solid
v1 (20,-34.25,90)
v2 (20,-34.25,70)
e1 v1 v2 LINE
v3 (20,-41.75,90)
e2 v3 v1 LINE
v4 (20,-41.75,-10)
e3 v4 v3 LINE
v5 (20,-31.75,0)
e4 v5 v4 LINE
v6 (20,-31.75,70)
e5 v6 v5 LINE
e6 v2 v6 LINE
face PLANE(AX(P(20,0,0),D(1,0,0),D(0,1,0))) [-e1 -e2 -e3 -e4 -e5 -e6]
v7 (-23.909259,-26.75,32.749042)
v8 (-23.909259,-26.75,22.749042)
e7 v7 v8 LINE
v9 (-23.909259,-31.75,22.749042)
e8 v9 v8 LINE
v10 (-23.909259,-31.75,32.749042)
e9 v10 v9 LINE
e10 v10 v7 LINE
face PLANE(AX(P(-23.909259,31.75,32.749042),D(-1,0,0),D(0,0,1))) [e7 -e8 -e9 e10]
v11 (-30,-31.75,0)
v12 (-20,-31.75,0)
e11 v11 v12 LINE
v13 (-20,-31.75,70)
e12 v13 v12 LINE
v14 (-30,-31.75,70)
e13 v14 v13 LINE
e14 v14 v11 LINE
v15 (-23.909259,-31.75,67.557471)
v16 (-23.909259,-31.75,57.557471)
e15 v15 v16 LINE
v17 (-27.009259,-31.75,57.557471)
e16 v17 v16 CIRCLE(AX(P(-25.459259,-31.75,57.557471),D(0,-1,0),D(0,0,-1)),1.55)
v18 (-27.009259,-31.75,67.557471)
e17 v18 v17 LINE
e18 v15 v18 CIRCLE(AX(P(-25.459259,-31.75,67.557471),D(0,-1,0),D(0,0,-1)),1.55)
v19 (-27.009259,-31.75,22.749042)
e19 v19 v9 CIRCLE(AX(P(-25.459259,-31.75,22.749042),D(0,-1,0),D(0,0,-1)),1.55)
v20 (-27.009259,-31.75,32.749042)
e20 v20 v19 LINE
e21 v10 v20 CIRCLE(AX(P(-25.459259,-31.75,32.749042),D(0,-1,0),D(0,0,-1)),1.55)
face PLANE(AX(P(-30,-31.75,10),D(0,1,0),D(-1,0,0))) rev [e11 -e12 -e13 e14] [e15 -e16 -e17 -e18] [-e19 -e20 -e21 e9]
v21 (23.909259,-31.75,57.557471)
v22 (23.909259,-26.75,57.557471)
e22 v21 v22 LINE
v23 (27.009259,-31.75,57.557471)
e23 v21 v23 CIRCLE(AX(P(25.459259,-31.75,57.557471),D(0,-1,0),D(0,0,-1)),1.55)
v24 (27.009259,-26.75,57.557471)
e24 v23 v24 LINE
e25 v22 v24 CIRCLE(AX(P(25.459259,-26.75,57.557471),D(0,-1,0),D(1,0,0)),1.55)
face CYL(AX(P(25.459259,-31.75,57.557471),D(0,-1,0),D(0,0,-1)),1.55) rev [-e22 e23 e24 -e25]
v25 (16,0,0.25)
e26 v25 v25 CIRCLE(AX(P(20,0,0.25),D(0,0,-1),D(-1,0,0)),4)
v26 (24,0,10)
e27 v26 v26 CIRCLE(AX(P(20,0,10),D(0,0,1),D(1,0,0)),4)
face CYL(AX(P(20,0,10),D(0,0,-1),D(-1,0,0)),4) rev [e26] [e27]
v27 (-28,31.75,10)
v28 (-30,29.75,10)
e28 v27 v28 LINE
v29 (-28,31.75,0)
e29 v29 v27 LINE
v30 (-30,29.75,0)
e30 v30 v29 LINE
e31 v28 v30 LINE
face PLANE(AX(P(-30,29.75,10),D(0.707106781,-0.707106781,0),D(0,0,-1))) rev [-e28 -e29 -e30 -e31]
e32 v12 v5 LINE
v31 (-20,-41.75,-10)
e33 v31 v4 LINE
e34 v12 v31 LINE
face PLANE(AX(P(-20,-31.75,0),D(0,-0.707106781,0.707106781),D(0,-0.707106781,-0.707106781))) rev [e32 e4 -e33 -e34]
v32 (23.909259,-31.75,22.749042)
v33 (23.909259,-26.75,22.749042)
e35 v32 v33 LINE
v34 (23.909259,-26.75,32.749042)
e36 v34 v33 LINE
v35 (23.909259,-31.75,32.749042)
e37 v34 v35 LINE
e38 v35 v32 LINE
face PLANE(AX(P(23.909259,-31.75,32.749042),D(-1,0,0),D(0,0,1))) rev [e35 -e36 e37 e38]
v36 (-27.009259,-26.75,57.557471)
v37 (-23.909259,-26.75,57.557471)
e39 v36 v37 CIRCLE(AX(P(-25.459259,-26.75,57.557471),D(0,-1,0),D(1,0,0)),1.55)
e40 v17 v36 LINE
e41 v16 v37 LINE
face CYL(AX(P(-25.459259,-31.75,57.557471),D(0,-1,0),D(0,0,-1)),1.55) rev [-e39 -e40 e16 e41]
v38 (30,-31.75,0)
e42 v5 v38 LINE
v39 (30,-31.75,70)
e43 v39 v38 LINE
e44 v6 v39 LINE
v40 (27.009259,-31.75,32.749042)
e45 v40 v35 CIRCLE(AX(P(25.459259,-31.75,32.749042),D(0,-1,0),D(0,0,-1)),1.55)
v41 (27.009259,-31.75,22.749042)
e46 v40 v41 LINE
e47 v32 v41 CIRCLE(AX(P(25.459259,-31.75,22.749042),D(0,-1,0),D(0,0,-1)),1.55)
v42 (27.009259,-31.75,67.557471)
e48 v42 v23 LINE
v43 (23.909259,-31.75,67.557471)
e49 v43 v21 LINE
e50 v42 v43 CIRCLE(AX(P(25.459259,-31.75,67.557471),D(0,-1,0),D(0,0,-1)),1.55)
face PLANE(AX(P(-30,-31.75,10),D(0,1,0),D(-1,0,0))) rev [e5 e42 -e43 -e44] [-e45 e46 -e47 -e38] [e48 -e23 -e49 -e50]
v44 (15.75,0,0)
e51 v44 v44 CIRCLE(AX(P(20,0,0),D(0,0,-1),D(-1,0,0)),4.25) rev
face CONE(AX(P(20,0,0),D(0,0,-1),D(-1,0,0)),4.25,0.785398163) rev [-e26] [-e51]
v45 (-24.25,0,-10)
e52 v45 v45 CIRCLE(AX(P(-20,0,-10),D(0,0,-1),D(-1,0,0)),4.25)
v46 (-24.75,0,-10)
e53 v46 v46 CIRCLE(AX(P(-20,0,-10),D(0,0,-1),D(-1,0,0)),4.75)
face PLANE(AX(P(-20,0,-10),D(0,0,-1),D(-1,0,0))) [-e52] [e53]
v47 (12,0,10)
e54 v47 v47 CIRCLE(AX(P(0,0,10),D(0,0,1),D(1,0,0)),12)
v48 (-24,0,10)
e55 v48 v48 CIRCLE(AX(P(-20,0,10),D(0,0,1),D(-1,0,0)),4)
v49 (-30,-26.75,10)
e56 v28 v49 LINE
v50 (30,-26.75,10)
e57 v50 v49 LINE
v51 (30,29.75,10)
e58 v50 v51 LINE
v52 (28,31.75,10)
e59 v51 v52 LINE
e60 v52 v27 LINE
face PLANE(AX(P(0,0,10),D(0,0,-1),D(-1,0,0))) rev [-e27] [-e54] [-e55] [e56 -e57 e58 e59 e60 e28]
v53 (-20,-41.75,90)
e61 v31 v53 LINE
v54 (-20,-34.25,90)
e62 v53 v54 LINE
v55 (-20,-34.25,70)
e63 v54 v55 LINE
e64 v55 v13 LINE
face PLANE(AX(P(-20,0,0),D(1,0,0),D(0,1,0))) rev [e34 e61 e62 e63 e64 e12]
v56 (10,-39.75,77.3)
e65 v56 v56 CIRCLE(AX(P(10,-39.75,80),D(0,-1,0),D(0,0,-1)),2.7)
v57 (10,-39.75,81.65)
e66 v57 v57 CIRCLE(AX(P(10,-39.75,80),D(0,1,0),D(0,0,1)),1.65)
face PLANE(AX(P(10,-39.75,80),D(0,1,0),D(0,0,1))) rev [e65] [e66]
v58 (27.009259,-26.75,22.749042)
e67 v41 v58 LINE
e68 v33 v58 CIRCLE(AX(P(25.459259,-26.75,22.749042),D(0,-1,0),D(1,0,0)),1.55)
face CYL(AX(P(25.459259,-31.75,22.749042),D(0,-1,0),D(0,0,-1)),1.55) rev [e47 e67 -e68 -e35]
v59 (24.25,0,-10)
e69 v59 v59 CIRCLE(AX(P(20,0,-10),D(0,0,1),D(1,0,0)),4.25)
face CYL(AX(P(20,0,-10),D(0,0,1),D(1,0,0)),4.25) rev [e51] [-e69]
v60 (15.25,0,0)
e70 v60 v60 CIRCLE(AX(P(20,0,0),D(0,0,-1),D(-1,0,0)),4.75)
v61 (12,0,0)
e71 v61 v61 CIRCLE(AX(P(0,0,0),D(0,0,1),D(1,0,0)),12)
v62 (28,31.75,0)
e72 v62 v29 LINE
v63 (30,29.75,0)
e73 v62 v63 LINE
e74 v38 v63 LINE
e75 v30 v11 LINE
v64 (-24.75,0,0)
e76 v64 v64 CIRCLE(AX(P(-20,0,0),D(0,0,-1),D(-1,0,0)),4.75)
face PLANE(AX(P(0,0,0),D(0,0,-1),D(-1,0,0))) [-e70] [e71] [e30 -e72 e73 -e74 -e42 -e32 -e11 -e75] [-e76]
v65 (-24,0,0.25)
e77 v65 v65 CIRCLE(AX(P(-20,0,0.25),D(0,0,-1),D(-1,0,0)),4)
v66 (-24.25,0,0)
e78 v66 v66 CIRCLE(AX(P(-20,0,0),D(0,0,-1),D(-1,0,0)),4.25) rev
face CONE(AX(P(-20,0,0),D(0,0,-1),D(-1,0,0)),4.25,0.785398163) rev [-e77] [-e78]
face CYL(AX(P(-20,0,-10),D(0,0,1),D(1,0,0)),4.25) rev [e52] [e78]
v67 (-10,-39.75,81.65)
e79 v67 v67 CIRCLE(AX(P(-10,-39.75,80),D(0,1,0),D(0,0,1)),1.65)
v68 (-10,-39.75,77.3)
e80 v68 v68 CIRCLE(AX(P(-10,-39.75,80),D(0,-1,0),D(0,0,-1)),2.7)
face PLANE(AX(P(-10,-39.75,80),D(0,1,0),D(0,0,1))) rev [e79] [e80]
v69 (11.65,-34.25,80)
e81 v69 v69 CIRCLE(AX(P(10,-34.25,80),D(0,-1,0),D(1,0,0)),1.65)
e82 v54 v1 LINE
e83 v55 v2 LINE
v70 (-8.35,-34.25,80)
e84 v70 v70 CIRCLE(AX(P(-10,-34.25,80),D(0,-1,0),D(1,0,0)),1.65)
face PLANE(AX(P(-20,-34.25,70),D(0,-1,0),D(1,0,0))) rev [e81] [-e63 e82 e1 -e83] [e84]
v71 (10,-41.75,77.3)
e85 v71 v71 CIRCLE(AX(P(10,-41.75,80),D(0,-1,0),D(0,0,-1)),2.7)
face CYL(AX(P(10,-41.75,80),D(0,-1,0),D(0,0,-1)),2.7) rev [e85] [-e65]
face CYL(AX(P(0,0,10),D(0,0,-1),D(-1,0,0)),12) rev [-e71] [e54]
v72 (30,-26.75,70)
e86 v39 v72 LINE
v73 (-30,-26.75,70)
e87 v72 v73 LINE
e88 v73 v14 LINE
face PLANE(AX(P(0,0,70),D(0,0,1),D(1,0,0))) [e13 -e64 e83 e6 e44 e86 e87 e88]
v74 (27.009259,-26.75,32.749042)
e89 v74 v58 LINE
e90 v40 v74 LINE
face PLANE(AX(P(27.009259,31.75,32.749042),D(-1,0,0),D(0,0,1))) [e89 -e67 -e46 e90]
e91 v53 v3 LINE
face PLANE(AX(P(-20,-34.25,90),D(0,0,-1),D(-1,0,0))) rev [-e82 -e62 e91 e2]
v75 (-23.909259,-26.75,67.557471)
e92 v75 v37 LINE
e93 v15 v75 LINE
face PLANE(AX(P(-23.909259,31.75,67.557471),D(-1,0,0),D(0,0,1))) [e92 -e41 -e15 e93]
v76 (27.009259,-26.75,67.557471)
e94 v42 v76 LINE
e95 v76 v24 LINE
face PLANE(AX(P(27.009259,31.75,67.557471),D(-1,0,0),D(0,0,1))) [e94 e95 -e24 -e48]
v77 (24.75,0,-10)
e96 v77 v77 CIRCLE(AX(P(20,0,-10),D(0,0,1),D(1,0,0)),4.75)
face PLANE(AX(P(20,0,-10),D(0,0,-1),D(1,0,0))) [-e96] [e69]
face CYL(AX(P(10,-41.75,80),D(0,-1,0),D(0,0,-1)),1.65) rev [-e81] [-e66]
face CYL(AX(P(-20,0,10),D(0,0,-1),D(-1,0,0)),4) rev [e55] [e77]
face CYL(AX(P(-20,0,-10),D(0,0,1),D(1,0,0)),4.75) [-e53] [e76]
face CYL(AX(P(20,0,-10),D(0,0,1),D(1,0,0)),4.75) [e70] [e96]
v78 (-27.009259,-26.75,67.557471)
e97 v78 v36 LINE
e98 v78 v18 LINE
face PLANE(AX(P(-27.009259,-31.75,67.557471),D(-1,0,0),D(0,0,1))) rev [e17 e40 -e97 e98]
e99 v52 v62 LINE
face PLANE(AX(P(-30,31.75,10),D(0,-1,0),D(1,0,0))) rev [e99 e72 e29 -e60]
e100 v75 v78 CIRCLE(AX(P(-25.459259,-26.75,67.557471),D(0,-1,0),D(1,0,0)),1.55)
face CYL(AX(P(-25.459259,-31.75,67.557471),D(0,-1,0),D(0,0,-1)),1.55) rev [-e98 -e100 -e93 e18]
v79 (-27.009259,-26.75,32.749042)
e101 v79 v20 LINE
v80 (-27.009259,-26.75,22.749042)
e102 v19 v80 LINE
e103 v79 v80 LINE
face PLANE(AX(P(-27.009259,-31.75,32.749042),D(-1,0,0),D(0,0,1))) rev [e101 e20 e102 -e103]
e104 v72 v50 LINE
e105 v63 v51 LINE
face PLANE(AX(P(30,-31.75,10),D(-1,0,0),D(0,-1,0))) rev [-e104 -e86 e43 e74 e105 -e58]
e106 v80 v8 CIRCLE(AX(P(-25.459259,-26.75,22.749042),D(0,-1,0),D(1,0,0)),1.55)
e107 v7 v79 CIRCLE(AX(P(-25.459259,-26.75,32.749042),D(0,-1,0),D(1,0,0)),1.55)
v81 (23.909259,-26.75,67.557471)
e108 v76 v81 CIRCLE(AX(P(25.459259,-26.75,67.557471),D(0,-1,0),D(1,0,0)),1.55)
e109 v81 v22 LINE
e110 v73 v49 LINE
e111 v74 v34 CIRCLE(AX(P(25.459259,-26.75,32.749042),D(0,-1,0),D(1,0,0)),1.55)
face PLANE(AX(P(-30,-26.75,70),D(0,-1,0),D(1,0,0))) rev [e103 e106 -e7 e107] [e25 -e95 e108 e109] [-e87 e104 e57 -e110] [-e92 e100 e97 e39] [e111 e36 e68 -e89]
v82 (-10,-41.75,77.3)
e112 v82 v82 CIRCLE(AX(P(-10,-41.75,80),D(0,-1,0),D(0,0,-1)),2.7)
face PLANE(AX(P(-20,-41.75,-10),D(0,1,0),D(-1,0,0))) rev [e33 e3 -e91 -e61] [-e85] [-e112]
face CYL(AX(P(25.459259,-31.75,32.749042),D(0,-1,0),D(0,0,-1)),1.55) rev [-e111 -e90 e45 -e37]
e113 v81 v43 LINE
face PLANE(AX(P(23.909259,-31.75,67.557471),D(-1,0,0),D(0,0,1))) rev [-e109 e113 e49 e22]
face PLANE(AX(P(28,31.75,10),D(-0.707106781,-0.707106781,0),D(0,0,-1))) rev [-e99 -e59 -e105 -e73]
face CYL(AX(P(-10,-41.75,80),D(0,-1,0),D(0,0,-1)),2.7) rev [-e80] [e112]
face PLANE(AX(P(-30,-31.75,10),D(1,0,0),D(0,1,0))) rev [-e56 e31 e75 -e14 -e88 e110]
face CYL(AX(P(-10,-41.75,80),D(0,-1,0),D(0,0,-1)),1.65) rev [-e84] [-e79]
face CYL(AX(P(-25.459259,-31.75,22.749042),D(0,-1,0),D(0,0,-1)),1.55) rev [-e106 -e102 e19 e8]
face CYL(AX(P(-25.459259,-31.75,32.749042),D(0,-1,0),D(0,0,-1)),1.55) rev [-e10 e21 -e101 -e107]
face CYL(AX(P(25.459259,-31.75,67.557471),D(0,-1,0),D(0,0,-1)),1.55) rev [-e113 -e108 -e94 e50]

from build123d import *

# Parameters (mm, degrees)
SKETCH_1_W          = 60
SKETCH_1_H          = 63.5
SKETCH_1_R          = 12
SKETCH_1_R_2        = 4
EXTRUDE_1_DEPTH     = 10
CHAMFER_1_SIZE      = 0.25
SKETCH_2_W          = 60
SKETCH_2_H          = 5
EXTRUDE_2_DEPTH     = 60
MM_START            = -31.75
MM_1_DEPTH          = 5
SKETCH_8_R          = 4.75
SKETCH_8_R_2        = 4.25
EXTRUDE_3_DEPTH     = 10
EXTRUDE_4_DEPTH     = 20
CHAMFER_4_SIZE      = 2
HOLE_WIZARD_2_D     = 5.4
HOLE_WIZARD_2_DEPTH = 2
HOLE_WIZARD_3_D     = 3.3


# Read off the part's stored shape, not the designer's step: 大小mm 暗销槽口1
with BuildPart() as part:
    # 草图1 → 凸台-拉伸1 (new body)
    with BuildSketch(Plane.XY):
        Rectangle(SKETCH_1_W, SKETCH_1_H)
        Circle(SKETCH_1_R, mode=Mode.SUBTRACT)
        with Locations((20, 0)):
            Circle(SKETCH_1_R_2, mode=Mode.SUBTRACT)
        with Locations(Location((-20, 0, 0), (0, 0, 180))):
            Circle(SKETCH_1_R_2, mode=Mode.SUBTRACT)
    extrude(amount=EXTRUDE_1_DEPTH)

    # 倒角1
    chamfer_1_edges = [part.edges().sort_by_distance(p)[0] for p in [
        (16, 0, 0),
        (-16, 0, 0),
    ]]
    chamfer(chamfer_1_edges, length=CHAMFER_1_SIZE)

    # 草图2 → 凸台-拉伸2 (add)
    with BuildSketch(Plane.XY.offset(10)):
        with Locations((0, -29.25)):
            Rectangle(SKETCH_2_W, SKETCH_2_H)
    extrude(amount=EXTRUDE_2_DEPTH)

    # 大小mm 暗销槽口1 outline → 大小mm 暗销槽口1 (cut)
    with BuildSketch(Plane(origin=(0, 0, 0), x_dir=(1, 0, 0), z_dir=(0, 1, 0)).offset(MM_START)):
        with BuildLine():
            ThreePointArc((23.909259259, -32.749042146), (25.459259259, -34.299042146), (27.009259259, -32.749042146))
            Line((27.009259259, -32.749042146), (27.009259259, -22.749042146))
            ThreePointArc((27.009259259, -22.749042146), (25.459259259, -21.199042146), (23.909259259, -22.749042146))
            Line((23.909259259, -22.749042146), (23.909259259, -32.749042146))
        make_face()
        with BuildLine():
            Line((27.009259259, -67.557471264), (27.009259259, -57.557471264))
            ThreePointArc((27.009259259, -57.557471264), (25.459259259, -56.007471264), (23.909259259, -57.557471264))
            Line((23.909259259, -57.557471264), (23.909259259, -67.557471264))
            ThreePointArc((23.909259259, -67.557471264), (25.459259259, -69.107471264), (27.009259259, -67.557471264))
        make_face()
        with BuildLine():
            Line((-23.909259259, -67.557471264), (-23.909259259, -57.557471264))
            ThreePointArc((-23.909259259, -57.557471264), (-25.459259259, -56.007471264), (-27.009259259, -57.557471264))
            Line((-27.009259259, -57.557471264), (-27.009259259, -67.557471264))
            ThreePointArc((-27.009259259, -67.557471264), (-25.459259259, -69.107471264), (-23.909259259, -67.557471264))
        make_face()
        with BuildLine():
            Line((-23.909259259, -32.749042146), (-23.909259259, -22.749042146))
            ThreePointArc((-23.909259259, -22.749042146), (-25.459259259, -21.199042146), (-27.009259259, -22.749042146))
            Line((-27.009259259, -22.749042146), (-27.009259259, -32.749042146))
            ThreePointArc((-27.009259259, -32.749042146), (-25.459259259, -34.299042146), (-23.909259259, -32.749042146))
        make_face()
    extrude(amount=MM_1_DEPTH, mode=Mode.SUBTRACT)

    # 草图8 → 凸台-拉伸3 (add)
    with BuildSketch(Plane(origin=(0, 0, 0), x_dir=(-1, 0, 0), z_dir=(0, 0, -1))):
        with Locations((20, 0)):
            Circle(SKETCH_8_R)
        with Locations((20, 0)):
            Circle(SKETCH_8_R_2, mode=Mode.SUBTRACT)
    extrude_3 = extrude(amount=EXTRUDE_3_DEPTH)

    # 镜向1: 凸台-拉伸3 across plane
    add(extrude_3.mirror(Plane.ZY))

    # 草图9 → 凸台-拉伸4 (add, symmetric)
    with BuildSketch(Plane.ZY):
        Polygon((0, -31.75), (-10, -41.75), (90, -41.75), (90, -34.25), (70, -34.25), (70, -31.75), align=None)
    extrude(amount=EXTRUDE_4_DEPTH, both=True)

    # 倒角4
    chamfer_4_edges = [part.edges().sort_by_distance(p)[0] for p in [
        (-30, 31.75, 5),
        (30, 31.75, 5),
    ]]
    chamfer(chamfer_4_edges, length=CHAMFER_4_SIZE)

    # 孔2
    with Locations(Plane(origin=(0, -41.75, 0), x_dir=(-1, 0, 0), z_dir=(0, -1, 0))):
        with Locations((-10, -80)):
            hole_wizard_2 = Hole(HOLE_WIZARD_2_D / 2, depth=HOLE_WIZARD_2_DEPTH)

    # 孔3 (through all)
    with Locations(Plane(origin=(0, -41.75, 0), x_dir=(-1, 0, 0), z_dir=(0, -1, 0))):
        with Locations((-10, -80)):
            hole_wizard_3 = Hole(HOLE_WIZARD_3_D / 2)

    # 镜向2: 孔2, 孔3 across plane
    add(hole_wizard_2.mirror(Plane.ZY), mode=Mode.SUBTRACT)
    add(hole_wizard_3.mirror(Plane.ZY), mode=Mode.SUBTRACT)


solid = part.part
